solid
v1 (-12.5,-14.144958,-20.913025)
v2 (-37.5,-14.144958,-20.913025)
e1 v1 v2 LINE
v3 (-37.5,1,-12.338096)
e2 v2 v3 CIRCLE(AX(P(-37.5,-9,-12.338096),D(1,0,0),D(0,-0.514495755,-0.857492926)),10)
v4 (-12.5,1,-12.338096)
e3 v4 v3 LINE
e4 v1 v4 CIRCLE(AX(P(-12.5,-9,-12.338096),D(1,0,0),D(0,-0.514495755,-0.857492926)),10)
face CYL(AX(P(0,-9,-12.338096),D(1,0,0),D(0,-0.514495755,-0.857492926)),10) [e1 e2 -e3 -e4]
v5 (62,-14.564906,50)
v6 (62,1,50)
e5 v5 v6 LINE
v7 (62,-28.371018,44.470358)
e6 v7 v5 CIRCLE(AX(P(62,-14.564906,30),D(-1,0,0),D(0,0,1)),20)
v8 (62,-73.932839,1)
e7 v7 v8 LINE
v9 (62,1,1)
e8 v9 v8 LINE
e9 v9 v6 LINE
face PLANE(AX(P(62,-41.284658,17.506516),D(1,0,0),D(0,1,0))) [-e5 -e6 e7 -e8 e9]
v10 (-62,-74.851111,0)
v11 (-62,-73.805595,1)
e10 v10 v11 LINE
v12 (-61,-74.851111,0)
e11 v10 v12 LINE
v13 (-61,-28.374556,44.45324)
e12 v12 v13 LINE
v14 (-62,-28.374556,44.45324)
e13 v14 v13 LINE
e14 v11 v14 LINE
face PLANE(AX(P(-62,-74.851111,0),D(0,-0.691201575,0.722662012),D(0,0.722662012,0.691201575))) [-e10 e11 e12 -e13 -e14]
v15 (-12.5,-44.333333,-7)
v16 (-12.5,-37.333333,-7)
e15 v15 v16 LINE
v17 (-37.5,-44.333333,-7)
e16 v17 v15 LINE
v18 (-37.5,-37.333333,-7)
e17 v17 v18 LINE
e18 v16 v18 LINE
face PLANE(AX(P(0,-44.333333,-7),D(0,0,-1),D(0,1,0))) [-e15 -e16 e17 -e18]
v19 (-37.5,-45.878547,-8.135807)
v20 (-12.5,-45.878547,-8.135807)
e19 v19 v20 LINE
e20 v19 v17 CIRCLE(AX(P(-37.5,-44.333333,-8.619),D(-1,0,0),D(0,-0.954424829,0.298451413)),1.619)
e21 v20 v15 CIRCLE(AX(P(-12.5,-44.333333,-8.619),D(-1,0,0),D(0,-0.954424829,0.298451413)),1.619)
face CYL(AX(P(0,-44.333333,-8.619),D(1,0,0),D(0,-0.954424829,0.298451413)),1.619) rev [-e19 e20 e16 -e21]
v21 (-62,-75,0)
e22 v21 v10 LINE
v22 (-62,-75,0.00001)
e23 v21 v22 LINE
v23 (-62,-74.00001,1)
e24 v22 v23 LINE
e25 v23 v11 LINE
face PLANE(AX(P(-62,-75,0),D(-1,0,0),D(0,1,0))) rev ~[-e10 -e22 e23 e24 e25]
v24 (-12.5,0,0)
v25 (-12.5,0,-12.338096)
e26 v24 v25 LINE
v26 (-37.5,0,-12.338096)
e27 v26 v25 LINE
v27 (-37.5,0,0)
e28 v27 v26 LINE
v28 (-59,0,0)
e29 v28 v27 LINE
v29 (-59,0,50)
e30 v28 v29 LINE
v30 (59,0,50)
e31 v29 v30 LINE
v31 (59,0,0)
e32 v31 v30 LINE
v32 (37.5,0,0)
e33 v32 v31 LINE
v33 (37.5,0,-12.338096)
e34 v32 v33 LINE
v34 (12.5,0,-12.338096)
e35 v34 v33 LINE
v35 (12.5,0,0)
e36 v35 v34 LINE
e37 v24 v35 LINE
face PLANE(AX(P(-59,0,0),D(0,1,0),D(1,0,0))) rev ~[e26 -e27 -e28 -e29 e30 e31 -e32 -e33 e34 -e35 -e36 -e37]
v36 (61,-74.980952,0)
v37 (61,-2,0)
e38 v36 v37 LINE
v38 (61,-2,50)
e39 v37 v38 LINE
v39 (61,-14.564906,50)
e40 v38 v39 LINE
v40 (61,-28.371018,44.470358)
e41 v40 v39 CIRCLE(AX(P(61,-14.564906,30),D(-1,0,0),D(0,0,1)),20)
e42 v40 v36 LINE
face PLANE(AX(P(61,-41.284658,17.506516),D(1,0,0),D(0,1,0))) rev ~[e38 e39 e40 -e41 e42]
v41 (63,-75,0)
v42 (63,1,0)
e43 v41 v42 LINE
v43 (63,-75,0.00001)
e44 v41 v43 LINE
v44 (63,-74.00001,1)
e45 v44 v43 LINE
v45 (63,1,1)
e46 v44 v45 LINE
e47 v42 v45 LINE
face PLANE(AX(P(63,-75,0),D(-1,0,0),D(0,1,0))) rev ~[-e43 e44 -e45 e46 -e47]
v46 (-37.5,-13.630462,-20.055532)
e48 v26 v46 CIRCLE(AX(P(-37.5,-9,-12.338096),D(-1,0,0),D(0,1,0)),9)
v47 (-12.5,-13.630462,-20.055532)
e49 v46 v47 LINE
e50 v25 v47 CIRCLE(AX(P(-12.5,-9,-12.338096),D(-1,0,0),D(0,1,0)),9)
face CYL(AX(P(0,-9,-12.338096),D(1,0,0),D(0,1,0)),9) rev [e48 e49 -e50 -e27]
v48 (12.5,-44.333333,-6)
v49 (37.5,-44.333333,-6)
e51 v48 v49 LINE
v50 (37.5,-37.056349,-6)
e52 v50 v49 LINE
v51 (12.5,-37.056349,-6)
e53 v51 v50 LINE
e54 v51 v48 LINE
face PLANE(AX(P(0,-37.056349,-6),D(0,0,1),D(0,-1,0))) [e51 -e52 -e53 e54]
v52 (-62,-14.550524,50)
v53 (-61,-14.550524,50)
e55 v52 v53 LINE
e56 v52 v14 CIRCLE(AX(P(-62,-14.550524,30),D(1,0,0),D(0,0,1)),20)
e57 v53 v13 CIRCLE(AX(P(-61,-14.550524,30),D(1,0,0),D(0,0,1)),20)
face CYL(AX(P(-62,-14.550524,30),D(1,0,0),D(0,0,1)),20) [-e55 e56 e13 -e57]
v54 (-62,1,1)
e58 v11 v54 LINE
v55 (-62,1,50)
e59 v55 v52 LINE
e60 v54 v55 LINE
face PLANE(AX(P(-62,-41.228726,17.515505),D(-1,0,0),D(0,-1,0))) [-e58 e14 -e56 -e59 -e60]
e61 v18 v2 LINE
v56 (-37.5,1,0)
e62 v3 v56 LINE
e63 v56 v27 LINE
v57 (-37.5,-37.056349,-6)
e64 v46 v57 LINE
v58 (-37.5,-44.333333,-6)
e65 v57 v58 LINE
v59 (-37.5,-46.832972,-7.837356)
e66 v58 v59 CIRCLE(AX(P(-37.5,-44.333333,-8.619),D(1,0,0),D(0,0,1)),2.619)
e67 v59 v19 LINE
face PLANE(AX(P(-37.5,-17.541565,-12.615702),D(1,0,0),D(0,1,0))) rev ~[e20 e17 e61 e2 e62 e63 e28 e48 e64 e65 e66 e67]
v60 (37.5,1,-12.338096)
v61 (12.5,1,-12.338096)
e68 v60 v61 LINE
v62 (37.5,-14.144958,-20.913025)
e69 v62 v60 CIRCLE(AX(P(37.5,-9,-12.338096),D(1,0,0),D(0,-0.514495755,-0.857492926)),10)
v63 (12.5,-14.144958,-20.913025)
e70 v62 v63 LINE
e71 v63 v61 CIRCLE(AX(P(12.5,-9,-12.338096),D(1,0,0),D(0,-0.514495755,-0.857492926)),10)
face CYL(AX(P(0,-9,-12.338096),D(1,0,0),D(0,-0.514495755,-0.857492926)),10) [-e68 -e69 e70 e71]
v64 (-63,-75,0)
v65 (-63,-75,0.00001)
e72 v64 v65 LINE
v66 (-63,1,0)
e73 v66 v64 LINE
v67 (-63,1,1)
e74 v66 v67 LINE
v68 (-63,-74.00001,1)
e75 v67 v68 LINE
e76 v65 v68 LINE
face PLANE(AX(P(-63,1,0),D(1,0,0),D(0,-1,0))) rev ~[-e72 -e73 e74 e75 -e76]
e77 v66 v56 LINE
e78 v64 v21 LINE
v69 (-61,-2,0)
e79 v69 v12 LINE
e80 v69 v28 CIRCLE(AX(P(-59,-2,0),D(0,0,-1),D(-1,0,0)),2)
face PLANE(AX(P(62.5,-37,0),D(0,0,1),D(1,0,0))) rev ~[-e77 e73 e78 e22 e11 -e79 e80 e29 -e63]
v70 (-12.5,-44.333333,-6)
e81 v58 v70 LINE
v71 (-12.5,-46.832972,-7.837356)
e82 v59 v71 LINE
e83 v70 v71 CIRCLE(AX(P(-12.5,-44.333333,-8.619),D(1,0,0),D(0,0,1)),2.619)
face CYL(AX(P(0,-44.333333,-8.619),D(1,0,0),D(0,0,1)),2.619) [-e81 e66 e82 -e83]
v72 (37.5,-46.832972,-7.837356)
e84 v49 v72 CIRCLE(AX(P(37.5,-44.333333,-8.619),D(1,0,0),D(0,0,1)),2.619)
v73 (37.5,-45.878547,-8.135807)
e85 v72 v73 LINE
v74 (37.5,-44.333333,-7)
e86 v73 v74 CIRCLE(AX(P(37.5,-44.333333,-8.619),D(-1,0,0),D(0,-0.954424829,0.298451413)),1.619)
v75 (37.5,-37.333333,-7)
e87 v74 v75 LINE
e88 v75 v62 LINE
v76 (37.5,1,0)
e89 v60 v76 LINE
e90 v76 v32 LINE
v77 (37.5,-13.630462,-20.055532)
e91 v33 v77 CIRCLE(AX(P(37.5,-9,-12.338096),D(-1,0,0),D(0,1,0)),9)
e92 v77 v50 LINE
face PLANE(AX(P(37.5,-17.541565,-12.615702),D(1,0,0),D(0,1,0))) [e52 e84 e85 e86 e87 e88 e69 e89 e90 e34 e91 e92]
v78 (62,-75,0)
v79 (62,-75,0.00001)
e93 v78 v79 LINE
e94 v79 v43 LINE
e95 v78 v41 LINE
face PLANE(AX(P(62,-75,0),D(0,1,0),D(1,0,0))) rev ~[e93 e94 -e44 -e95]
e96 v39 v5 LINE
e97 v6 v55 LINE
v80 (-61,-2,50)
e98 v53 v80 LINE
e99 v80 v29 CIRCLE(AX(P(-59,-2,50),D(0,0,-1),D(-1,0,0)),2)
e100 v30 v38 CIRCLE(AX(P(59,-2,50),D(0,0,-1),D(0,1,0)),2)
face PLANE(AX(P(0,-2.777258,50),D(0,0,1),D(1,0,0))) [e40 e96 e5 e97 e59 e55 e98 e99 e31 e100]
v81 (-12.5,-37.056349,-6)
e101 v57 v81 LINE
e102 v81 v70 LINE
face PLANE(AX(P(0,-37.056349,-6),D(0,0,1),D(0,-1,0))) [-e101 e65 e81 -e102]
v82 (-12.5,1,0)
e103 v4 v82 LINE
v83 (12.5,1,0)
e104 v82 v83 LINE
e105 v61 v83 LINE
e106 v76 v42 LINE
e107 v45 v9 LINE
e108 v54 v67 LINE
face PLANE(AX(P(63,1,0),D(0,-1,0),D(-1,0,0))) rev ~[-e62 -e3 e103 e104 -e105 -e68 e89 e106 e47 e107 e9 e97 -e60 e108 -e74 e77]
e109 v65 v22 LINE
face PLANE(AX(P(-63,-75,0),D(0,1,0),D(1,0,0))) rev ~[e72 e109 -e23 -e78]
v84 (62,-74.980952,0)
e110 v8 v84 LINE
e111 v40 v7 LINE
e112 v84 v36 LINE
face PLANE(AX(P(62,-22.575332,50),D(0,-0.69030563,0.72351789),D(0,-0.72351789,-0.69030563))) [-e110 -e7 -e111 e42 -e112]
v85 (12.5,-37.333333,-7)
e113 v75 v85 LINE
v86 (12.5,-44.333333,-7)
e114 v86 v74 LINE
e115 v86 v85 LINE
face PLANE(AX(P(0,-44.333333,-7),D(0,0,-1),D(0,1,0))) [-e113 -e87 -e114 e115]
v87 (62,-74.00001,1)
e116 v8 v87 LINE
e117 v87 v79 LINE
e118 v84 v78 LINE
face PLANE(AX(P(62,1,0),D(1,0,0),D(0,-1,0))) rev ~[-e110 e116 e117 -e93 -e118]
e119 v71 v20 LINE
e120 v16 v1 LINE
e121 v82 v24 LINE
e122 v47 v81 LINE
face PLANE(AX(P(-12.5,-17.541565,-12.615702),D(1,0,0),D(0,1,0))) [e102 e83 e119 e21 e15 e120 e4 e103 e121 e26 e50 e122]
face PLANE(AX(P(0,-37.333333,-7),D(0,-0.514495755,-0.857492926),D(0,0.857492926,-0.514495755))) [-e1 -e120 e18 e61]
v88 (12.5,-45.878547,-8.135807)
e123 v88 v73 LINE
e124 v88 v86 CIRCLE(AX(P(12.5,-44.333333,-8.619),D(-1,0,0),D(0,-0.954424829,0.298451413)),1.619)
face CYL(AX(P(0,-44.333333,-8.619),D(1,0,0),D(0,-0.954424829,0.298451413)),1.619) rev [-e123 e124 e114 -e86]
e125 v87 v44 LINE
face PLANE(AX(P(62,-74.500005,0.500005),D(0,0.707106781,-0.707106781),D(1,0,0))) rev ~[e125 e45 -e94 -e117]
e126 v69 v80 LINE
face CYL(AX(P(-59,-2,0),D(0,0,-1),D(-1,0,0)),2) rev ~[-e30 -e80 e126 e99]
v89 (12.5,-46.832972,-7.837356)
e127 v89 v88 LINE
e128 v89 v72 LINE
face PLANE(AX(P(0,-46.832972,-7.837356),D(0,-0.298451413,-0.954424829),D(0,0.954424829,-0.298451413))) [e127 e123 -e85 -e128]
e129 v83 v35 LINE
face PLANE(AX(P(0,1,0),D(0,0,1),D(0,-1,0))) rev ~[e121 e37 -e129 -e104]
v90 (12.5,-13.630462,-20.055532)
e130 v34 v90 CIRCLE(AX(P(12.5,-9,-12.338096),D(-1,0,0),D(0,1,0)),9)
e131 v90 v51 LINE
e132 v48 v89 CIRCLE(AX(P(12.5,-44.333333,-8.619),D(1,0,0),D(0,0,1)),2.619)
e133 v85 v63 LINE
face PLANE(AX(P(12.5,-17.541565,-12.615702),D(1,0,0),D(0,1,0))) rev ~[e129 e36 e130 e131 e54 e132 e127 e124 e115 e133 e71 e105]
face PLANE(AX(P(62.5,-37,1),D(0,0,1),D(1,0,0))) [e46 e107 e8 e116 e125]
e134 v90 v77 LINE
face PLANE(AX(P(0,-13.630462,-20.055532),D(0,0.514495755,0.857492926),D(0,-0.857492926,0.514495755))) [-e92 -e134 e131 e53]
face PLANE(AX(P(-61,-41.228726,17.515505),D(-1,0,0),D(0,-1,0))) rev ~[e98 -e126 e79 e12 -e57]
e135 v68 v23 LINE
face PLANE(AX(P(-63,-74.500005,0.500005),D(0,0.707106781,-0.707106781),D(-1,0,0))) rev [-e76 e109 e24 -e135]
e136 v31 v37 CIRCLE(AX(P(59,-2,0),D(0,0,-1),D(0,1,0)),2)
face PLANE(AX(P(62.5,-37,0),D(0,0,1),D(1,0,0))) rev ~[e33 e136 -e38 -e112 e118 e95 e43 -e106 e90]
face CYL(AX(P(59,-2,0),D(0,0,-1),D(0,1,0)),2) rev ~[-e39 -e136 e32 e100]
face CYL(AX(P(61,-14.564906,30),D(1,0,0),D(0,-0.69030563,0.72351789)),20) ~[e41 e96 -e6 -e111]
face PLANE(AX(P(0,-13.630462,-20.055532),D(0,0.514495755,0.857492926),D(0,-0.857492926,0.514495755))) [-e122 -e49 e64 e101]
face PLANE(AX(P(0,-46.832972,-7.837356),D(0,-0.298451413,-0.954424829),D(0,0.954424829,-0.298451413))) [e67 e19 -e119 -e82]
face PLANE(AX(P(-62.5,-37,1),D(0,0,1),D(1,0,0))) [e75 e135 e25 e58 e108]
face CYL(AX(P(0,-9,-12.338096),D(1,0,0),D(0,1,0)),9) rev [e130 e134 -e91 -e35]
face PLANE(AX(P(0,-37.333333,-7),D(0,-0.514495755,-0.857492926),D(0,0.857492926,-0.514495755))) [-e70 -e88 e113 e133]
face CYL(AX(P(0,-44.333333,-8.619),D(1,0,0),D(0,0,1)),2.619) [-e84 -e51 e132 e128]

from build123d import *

# Parameters (mm, degrees)
F1_DEPTH  = 50
F3_DEPTH  = 1
F5_DEPTH  = 1
F6_DEPTH  = 1
F7_SIZE   = 0.99999
F9_DEPTH  = 37.5
F10_DEPTH = 12.5
F11_R     = 20


# Not quite as in the source:
# - a fillet or chamfer is up to 0.001 mm smaller than in the source, because OpenCascade refuses the exact size


with BuildPart() as f1:
    # F0 (on Top) → F1 (new body)
    with BuildSketch(Plane.XY):
        with BuildLine():
            Line((-59, 0), (0, 0))
            Line((0, 0), (59, 0))
            ThreePointArc((59, 0), (60.4142135624, -0.5857864376), (61, -2))
            Line((61, -2), (61, -22.5753318518))
            Line((61, -22.5753318518), (62, -22.5753318518))
            Line((62, -22.5753318518), (62, 1))
            Line((62, 1), (0, 1))
            Line((0, 1), (-62, 1))
            Line((-62, 1), (-62, -22.5753318518))
            Line((-62, -22.5753318518), (-61, -22.5753318518))
            Line((-61, -22.5753318518), (-61, -2))
            ThreePointArc((-61, -2), (-60.4142135624, -0.5857864376), (-59, 0))
        make_face()
    extrude(amount=F1_DEPTH)

    # F2 (on face) → F3 (join)
    with BuildSketch(Plane(origin=(-62, 0, 0), x_dir=(0, -1, 0), z_dir=(-1, 0, 0))):
        Polygon((74.8511105776, 0), (22.5753318518, 50), (22.5753318518, 0), align=None)
    extrude(amount=-F3_DEPTH)

    # F4 (on face) → F5 (join)
    with BuildSketch(Plane.YZ.offset(62)):
        Polygon((-22.5753318518, 0), (-22.5753318518, 50), (-74.9809518456, 0), align=None)
    extrude(amount=-F5_DEPTH)

    # F0 (on Top) → F6 (join)
    with BuildSketch(Plane.XY):
        Polygon((62, 1), (62, -22.5753318518), (62, -75), (63, -75), (63, 1), align=None)
        Polygon((-62, -75), (-62, -22.5753318518), (-62, 1), (-63, 1), (-63, -75), align=None)
    extrude(amount=F6_DEPTH)

    # F7 (size 1 in the source; OpenCascade refuses exactly that, so slightly less here)
    f7_edges = [f1.edges().sort_by_distance(p)[0] for p in [
        (62.5, -75, 1),
        (-62.5, -75, 1),
    ]]
    chamfer(f7_edges, length=F7_SIZE)

    # F8 (on Right) → F9 (join, symmetric)
    with BuildSketch(Plane.YZ):
        with BuildLine():
            Line((1, -12.3380962103), (1, 0))
            Line((1, 0), (-6.78e-08, 0))
            Line((-6.78e-08, 0), (-6.78e-08, -12.3380962103))
            ThreePointArc((-6.78e-08, -12.3380962103), (-4.5657106986, -20.1698953121), (-13.6304617639, -20.0555324836))
            Line((-13.6304617639, -20.0555324836), (-37.0563493496, -5.9999999322))
            Line((-37.0563493496, -5.9999999322), (-44.3333333333, -5.9999999322))
            ThreePointArc((-44.3333333333, -5.9999999322), (-45.8844675886, -6.5087526502), (-46.8329720249, -7.8373557287))
            Line((-46.8329720249, -7.8373557287), (-45.8785471313, -8.1358071621))
            ThreePointArc((-45.8785471313, -8.1358071621), (-45.2922055343, -7.3144981402), (-44.3333333333, -7))
            Line((-44.3333333333, -7), (-37.3333333333, -7))
            Line((-37.3333333333, -7), (-14.1449575543, -20.9130254674))
            ThreePointArc((-14.1449575543, -20.9130254674), (-4.0730118502, -21.0400952778), (1, -12.3380962103))
        make_face()
    extrude(amount=F9_DEPTH, both=True)

    # F8 (on Right) → F10 (cut, symmetric)
    with BuildSketch(Plane.YZ):
        with BuildLine():
            Line((1, -12.3380962103), (1, 0))
            Line((1, 0), (-6.78e-08, 0))
            Line((-6.78e-08, 0), (-6.78e-08, -12.3380962103))
            ThreePointArc((-6.78e-08, -12.3380962103), (-4.5657106986, -20.1698953121), (-13.6304617639, -20.0555324836))
            Line((-13.6304617639, -20.0555324836), (-37.0563493496, -5.9999999322))
            Line((-37.0563493496, -5.9999999322), (-44.3333333333, -5.9999999322))
            ThreePointArc((-44.3333333333, -5.9999999322), (-45.8844675886, -6.5087526502), (-46.8329720249, -7.8373557287))
            Line((-46.8329720249, -7.8373557287), (-45.8785471313, -8.1358071621))
            ThreePointArc((-45.8785471313, -8.1358071621), (-45.2922055343, -7.3144981402), (-44.3333333333, -7))
            Line((-44.3333333333, -7), (-37.3333333333, -7))
            Line((-37.3333333333, -7), (-14.1449575543, -20.9130254674))
            ThreePointArc((-14.1449575543, -20.9130254674), (-4.0730118502, -21.0400952778), (1, -12.3380962103))
        make_face()
    extrude(amount=F10_DEPTH, both=True, mode=Mode.SUBTRACT)

    # F11
    f11_edges = [f1.edges().sort_by_distance(p)[0] for p in [
        (-61.5, -22.575332, 50),
        (61.5, -22.575332, 50),
    ]]
    fillet(f11_edges, radius=F11_R)


solid = f1.part
